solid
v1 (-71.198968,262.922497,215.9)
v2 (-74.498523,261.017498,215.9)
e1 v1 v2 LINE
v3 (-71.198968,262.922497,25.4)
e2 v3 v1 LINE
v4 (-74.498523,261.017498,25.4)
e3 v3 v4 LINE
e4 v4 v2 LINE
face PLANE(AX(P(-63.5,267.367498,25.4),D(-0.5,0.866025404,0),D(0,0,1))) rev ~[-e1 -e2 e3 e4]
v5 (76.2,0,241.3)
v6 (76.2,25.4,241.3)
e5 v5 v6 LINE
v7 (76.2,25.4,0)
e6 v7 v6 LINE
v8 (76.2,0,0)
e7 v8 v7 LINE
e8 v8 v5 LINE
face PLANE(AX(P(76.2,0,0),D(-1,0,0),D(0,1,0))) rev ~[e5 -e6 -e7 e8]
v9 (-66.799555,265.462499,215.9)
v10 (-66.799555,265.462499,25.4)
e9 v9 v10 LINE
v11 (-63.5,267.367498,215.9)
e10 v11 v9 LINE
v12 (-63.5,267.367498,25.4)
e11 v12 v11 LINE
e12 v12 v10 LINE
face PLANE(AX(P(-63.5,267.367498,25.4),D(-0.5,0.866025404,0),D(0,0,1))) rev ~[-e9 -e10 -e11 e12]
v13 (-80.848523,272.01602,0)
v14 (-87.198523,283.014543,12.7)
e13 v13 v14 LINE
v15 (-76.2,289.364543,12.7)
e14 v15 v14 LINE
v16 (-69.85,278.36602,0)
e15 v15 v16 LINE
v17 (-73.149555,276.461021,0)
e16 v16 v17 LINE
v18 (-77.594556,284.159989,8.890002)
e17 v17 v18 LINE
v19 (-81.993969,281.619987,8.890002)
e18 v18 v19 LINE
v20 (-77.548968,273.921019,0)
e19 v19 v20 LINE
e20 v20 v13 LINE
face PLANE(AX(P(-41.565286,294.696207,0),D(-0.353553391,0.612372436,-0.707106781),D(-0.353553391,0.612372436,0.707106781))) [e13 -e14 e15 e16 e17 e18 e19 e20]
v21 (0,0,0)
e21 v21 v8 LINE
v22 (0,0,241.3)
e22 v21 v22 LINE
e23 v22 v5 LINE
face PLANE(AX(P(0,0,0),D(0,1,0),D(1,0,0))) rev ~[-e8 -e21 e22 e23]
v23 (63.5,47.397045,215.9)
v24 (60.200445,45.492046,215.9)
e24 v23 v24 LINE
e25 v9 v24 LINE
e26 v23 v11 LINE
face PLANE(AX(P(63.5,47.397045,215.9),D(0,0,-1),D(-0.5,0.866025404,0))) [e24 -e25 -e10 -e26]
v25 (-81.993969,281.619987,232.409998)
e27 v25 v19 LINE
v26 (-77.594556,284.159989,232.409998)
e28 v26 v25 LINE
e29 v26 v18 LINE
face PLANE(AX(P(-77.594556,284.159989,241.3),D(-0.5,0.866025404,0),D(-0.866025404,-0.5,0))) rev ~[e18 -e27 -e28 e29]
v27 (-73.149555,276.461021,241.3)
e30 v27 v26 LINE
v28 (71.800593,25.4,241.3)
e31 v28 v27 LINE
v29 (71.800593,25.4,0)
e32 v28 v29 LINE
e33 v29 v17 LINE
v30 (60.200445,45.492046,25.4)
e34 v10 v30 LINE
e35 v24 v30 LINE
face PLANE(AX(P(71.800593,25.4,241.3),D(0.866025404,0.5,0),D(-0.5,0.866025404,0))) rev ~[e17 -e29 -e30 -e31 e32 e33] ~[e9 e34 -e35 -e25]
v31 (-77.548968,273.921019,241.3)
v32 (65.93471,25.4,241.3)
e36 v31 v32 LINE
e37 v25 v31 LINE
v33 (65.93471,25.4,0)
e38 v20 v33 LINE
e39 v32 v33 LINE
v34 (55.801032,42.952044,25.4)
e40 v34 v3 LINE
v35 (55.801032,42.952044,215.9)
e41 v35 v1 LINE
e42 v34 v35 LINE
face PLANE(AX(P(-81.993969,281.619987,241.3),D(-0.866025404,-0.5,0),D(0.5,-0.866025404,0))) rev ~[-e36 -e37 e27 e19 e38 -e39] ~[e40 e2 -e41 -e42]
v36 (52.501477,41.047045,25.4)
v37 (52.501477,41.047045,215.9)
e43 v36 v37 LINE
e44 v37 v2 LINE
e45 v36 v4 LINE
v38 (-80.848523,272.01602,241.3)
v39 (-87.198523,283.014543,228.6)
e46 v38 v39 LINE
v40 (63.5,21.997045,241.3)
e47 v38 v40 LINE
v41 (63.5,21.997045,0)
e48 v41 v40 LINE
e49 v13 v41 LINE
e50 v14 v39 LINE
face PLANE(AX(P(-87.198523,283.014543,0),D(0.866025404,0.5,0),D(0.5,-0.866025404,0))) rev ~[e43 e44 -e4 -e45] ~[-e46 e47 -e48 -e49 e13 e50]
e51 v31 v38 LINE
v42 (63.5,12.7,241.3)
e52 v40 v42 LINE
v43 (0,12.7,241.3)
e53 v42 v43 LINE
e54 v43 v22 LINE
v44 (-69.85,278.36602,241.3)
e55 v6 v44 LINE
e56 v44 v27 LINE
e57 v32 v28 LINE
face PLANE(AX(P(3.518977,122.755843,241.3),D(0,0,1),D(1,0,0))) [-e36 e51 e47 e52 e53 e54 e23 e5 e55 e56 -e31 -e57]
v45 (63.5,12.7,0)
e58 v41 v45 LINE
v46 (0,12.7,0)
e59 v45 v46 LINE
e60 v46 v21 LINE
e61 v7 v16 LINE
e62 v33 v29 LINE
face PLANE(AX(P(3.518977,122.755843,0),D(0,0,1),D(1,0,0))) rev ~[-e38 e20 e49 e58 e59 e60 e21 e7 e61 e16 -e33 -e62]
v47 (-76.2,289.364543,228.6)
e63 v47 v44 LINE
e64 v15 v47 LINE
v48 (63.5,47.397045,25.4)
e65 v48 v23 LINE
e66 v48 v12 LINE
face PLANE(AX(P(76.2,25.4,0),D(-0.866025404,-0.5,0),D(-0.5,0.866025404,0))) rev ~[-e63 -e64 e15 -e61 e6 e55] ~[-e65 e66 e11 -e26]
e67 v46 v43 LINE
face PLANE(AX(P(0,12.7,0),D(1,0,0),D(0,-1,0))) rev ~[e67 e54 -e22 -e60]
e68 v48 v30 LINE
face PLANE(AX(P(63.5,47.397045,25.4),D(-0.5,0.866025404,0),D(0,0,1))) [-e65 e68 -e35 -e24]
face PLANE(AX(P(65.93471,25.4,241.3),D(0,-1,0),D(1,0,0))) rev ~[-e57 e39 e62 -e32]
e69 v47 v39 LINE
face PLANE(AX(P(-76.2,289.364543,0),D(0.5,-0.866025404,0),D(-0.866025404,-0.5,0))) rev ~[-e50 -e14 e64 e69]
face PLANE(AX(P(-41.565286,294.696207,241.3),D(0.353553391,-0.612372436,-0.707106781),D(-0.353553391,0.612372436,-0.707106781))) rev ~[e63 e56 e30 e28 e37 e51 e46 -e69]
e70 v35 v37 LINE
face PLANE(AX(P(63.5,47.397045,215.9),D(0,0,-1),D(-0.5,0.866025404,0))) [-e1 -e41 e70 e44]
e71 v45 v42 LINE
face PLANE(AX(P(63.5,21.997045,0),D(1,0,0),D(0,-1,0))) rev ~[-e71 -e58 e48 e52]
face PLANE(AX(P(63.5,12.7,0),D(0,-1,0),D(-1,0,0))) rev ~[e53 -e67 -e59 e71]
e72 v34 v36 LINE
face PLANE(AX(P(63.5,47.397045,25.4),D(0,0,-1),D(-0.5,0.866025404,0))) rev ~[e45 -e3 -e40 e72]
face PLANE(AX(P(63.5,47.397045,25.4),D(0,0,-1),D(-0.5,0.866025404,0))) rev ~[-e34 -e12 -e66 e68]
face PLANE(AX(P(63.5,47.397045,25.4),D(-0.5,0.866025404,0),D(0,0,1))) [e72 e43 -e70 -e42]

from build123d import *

# Parameters (mm, degrees)
F1_DEPTH    = 241.3
F2_W        = 254
F2_H        = 190.5
F3_DEPTH    = 25.4
F5_DEPTH    = 508
F6_T1_DEPTH = 78.0207478943
F7_T1_DEPTH = 78.0207478943


# Not quite as in the source:
# - a fillet or chamfer that OpenCascade refuses, or shapes differently, is made with other operations: its cross-section is extruded or revolved along the edge and cut away or added


with BuildPart() as f1:
    # F0 (on Top) → F1 (new body)
    with BuildSketch(Plane.XY):
        Polygon((0, 12.7), (0, 0), (76.2, 0), (76.2, 25.4), (-76.2, 289.3645430735), (-87.1985226281, 283.0145430735), (63.5, 21.9970452561), (63.5, 12.7), align=None)
    extrude(amount=F1_DEPTH)

    # F2 (on face) → F3 (cut)
    with BuildSketch(Plane(origin=(68.1485226281, 39.3455678842, 0), x_dir=(-0.5, 0.8660254038, 0), z_dir=(0.8660254038, 0.5, 0))):
        with Locations((136.2970452561, 120.65)):
            Rectangle(F2_W, F2_H)
    extrude(amount=-F3_DEPTH, mode=Mode.SUBTRACT)

    # F4 (on face) → F5 (cut)
    with BuildSketch(Plane.XY.offset(241.3)):
        Polygon((-81.9939685629, 281.6199870148), (65.9347099118, 25.4), (71.8005932508, 25.4), (-77.5945560587, 284.1599890084), align=None)
    extrude(amount=-F5_DEPTH, mode=Mode.SUBTRACT)

    # F6: chamfer of 12.7 on 1 edges, made by hand

    # F6_s2 → F6_t1 (cut)
    with BuildSketch(Plane(origin=(96.4332361634, 55.6757548578, 0), x_dir=(0, 0, 1), z_dir=(-0.8660254038, -0.5, 0))):
        Polygon((0, 275.9970452561), (12.7, 288.6970452561), (0, 288.6970452561), align=None)
    extrude(amount=F6_T1_DEPTH, mode=Mode.SUBTRACT)

    # F7: chamfer of 12.7 on 1 edges, made by hand

    # F7_s2 → F7_t1 (cut)
    with BuildSketch(Plane(origin=(96.4332361634, 55.6757548578, 0), x_dir=(0, 0, 1), z_dir=(-0.8660254038, -0.5, 0))):
        Polygon((241.3, 275.9970452561), (228.6, 288.6970452561), (241.3, 288.6970452561), align=None)
    extrude(amount=F7_T1_DEPTH, mode=Mode.SUBTRACT)


solid = f1.part
